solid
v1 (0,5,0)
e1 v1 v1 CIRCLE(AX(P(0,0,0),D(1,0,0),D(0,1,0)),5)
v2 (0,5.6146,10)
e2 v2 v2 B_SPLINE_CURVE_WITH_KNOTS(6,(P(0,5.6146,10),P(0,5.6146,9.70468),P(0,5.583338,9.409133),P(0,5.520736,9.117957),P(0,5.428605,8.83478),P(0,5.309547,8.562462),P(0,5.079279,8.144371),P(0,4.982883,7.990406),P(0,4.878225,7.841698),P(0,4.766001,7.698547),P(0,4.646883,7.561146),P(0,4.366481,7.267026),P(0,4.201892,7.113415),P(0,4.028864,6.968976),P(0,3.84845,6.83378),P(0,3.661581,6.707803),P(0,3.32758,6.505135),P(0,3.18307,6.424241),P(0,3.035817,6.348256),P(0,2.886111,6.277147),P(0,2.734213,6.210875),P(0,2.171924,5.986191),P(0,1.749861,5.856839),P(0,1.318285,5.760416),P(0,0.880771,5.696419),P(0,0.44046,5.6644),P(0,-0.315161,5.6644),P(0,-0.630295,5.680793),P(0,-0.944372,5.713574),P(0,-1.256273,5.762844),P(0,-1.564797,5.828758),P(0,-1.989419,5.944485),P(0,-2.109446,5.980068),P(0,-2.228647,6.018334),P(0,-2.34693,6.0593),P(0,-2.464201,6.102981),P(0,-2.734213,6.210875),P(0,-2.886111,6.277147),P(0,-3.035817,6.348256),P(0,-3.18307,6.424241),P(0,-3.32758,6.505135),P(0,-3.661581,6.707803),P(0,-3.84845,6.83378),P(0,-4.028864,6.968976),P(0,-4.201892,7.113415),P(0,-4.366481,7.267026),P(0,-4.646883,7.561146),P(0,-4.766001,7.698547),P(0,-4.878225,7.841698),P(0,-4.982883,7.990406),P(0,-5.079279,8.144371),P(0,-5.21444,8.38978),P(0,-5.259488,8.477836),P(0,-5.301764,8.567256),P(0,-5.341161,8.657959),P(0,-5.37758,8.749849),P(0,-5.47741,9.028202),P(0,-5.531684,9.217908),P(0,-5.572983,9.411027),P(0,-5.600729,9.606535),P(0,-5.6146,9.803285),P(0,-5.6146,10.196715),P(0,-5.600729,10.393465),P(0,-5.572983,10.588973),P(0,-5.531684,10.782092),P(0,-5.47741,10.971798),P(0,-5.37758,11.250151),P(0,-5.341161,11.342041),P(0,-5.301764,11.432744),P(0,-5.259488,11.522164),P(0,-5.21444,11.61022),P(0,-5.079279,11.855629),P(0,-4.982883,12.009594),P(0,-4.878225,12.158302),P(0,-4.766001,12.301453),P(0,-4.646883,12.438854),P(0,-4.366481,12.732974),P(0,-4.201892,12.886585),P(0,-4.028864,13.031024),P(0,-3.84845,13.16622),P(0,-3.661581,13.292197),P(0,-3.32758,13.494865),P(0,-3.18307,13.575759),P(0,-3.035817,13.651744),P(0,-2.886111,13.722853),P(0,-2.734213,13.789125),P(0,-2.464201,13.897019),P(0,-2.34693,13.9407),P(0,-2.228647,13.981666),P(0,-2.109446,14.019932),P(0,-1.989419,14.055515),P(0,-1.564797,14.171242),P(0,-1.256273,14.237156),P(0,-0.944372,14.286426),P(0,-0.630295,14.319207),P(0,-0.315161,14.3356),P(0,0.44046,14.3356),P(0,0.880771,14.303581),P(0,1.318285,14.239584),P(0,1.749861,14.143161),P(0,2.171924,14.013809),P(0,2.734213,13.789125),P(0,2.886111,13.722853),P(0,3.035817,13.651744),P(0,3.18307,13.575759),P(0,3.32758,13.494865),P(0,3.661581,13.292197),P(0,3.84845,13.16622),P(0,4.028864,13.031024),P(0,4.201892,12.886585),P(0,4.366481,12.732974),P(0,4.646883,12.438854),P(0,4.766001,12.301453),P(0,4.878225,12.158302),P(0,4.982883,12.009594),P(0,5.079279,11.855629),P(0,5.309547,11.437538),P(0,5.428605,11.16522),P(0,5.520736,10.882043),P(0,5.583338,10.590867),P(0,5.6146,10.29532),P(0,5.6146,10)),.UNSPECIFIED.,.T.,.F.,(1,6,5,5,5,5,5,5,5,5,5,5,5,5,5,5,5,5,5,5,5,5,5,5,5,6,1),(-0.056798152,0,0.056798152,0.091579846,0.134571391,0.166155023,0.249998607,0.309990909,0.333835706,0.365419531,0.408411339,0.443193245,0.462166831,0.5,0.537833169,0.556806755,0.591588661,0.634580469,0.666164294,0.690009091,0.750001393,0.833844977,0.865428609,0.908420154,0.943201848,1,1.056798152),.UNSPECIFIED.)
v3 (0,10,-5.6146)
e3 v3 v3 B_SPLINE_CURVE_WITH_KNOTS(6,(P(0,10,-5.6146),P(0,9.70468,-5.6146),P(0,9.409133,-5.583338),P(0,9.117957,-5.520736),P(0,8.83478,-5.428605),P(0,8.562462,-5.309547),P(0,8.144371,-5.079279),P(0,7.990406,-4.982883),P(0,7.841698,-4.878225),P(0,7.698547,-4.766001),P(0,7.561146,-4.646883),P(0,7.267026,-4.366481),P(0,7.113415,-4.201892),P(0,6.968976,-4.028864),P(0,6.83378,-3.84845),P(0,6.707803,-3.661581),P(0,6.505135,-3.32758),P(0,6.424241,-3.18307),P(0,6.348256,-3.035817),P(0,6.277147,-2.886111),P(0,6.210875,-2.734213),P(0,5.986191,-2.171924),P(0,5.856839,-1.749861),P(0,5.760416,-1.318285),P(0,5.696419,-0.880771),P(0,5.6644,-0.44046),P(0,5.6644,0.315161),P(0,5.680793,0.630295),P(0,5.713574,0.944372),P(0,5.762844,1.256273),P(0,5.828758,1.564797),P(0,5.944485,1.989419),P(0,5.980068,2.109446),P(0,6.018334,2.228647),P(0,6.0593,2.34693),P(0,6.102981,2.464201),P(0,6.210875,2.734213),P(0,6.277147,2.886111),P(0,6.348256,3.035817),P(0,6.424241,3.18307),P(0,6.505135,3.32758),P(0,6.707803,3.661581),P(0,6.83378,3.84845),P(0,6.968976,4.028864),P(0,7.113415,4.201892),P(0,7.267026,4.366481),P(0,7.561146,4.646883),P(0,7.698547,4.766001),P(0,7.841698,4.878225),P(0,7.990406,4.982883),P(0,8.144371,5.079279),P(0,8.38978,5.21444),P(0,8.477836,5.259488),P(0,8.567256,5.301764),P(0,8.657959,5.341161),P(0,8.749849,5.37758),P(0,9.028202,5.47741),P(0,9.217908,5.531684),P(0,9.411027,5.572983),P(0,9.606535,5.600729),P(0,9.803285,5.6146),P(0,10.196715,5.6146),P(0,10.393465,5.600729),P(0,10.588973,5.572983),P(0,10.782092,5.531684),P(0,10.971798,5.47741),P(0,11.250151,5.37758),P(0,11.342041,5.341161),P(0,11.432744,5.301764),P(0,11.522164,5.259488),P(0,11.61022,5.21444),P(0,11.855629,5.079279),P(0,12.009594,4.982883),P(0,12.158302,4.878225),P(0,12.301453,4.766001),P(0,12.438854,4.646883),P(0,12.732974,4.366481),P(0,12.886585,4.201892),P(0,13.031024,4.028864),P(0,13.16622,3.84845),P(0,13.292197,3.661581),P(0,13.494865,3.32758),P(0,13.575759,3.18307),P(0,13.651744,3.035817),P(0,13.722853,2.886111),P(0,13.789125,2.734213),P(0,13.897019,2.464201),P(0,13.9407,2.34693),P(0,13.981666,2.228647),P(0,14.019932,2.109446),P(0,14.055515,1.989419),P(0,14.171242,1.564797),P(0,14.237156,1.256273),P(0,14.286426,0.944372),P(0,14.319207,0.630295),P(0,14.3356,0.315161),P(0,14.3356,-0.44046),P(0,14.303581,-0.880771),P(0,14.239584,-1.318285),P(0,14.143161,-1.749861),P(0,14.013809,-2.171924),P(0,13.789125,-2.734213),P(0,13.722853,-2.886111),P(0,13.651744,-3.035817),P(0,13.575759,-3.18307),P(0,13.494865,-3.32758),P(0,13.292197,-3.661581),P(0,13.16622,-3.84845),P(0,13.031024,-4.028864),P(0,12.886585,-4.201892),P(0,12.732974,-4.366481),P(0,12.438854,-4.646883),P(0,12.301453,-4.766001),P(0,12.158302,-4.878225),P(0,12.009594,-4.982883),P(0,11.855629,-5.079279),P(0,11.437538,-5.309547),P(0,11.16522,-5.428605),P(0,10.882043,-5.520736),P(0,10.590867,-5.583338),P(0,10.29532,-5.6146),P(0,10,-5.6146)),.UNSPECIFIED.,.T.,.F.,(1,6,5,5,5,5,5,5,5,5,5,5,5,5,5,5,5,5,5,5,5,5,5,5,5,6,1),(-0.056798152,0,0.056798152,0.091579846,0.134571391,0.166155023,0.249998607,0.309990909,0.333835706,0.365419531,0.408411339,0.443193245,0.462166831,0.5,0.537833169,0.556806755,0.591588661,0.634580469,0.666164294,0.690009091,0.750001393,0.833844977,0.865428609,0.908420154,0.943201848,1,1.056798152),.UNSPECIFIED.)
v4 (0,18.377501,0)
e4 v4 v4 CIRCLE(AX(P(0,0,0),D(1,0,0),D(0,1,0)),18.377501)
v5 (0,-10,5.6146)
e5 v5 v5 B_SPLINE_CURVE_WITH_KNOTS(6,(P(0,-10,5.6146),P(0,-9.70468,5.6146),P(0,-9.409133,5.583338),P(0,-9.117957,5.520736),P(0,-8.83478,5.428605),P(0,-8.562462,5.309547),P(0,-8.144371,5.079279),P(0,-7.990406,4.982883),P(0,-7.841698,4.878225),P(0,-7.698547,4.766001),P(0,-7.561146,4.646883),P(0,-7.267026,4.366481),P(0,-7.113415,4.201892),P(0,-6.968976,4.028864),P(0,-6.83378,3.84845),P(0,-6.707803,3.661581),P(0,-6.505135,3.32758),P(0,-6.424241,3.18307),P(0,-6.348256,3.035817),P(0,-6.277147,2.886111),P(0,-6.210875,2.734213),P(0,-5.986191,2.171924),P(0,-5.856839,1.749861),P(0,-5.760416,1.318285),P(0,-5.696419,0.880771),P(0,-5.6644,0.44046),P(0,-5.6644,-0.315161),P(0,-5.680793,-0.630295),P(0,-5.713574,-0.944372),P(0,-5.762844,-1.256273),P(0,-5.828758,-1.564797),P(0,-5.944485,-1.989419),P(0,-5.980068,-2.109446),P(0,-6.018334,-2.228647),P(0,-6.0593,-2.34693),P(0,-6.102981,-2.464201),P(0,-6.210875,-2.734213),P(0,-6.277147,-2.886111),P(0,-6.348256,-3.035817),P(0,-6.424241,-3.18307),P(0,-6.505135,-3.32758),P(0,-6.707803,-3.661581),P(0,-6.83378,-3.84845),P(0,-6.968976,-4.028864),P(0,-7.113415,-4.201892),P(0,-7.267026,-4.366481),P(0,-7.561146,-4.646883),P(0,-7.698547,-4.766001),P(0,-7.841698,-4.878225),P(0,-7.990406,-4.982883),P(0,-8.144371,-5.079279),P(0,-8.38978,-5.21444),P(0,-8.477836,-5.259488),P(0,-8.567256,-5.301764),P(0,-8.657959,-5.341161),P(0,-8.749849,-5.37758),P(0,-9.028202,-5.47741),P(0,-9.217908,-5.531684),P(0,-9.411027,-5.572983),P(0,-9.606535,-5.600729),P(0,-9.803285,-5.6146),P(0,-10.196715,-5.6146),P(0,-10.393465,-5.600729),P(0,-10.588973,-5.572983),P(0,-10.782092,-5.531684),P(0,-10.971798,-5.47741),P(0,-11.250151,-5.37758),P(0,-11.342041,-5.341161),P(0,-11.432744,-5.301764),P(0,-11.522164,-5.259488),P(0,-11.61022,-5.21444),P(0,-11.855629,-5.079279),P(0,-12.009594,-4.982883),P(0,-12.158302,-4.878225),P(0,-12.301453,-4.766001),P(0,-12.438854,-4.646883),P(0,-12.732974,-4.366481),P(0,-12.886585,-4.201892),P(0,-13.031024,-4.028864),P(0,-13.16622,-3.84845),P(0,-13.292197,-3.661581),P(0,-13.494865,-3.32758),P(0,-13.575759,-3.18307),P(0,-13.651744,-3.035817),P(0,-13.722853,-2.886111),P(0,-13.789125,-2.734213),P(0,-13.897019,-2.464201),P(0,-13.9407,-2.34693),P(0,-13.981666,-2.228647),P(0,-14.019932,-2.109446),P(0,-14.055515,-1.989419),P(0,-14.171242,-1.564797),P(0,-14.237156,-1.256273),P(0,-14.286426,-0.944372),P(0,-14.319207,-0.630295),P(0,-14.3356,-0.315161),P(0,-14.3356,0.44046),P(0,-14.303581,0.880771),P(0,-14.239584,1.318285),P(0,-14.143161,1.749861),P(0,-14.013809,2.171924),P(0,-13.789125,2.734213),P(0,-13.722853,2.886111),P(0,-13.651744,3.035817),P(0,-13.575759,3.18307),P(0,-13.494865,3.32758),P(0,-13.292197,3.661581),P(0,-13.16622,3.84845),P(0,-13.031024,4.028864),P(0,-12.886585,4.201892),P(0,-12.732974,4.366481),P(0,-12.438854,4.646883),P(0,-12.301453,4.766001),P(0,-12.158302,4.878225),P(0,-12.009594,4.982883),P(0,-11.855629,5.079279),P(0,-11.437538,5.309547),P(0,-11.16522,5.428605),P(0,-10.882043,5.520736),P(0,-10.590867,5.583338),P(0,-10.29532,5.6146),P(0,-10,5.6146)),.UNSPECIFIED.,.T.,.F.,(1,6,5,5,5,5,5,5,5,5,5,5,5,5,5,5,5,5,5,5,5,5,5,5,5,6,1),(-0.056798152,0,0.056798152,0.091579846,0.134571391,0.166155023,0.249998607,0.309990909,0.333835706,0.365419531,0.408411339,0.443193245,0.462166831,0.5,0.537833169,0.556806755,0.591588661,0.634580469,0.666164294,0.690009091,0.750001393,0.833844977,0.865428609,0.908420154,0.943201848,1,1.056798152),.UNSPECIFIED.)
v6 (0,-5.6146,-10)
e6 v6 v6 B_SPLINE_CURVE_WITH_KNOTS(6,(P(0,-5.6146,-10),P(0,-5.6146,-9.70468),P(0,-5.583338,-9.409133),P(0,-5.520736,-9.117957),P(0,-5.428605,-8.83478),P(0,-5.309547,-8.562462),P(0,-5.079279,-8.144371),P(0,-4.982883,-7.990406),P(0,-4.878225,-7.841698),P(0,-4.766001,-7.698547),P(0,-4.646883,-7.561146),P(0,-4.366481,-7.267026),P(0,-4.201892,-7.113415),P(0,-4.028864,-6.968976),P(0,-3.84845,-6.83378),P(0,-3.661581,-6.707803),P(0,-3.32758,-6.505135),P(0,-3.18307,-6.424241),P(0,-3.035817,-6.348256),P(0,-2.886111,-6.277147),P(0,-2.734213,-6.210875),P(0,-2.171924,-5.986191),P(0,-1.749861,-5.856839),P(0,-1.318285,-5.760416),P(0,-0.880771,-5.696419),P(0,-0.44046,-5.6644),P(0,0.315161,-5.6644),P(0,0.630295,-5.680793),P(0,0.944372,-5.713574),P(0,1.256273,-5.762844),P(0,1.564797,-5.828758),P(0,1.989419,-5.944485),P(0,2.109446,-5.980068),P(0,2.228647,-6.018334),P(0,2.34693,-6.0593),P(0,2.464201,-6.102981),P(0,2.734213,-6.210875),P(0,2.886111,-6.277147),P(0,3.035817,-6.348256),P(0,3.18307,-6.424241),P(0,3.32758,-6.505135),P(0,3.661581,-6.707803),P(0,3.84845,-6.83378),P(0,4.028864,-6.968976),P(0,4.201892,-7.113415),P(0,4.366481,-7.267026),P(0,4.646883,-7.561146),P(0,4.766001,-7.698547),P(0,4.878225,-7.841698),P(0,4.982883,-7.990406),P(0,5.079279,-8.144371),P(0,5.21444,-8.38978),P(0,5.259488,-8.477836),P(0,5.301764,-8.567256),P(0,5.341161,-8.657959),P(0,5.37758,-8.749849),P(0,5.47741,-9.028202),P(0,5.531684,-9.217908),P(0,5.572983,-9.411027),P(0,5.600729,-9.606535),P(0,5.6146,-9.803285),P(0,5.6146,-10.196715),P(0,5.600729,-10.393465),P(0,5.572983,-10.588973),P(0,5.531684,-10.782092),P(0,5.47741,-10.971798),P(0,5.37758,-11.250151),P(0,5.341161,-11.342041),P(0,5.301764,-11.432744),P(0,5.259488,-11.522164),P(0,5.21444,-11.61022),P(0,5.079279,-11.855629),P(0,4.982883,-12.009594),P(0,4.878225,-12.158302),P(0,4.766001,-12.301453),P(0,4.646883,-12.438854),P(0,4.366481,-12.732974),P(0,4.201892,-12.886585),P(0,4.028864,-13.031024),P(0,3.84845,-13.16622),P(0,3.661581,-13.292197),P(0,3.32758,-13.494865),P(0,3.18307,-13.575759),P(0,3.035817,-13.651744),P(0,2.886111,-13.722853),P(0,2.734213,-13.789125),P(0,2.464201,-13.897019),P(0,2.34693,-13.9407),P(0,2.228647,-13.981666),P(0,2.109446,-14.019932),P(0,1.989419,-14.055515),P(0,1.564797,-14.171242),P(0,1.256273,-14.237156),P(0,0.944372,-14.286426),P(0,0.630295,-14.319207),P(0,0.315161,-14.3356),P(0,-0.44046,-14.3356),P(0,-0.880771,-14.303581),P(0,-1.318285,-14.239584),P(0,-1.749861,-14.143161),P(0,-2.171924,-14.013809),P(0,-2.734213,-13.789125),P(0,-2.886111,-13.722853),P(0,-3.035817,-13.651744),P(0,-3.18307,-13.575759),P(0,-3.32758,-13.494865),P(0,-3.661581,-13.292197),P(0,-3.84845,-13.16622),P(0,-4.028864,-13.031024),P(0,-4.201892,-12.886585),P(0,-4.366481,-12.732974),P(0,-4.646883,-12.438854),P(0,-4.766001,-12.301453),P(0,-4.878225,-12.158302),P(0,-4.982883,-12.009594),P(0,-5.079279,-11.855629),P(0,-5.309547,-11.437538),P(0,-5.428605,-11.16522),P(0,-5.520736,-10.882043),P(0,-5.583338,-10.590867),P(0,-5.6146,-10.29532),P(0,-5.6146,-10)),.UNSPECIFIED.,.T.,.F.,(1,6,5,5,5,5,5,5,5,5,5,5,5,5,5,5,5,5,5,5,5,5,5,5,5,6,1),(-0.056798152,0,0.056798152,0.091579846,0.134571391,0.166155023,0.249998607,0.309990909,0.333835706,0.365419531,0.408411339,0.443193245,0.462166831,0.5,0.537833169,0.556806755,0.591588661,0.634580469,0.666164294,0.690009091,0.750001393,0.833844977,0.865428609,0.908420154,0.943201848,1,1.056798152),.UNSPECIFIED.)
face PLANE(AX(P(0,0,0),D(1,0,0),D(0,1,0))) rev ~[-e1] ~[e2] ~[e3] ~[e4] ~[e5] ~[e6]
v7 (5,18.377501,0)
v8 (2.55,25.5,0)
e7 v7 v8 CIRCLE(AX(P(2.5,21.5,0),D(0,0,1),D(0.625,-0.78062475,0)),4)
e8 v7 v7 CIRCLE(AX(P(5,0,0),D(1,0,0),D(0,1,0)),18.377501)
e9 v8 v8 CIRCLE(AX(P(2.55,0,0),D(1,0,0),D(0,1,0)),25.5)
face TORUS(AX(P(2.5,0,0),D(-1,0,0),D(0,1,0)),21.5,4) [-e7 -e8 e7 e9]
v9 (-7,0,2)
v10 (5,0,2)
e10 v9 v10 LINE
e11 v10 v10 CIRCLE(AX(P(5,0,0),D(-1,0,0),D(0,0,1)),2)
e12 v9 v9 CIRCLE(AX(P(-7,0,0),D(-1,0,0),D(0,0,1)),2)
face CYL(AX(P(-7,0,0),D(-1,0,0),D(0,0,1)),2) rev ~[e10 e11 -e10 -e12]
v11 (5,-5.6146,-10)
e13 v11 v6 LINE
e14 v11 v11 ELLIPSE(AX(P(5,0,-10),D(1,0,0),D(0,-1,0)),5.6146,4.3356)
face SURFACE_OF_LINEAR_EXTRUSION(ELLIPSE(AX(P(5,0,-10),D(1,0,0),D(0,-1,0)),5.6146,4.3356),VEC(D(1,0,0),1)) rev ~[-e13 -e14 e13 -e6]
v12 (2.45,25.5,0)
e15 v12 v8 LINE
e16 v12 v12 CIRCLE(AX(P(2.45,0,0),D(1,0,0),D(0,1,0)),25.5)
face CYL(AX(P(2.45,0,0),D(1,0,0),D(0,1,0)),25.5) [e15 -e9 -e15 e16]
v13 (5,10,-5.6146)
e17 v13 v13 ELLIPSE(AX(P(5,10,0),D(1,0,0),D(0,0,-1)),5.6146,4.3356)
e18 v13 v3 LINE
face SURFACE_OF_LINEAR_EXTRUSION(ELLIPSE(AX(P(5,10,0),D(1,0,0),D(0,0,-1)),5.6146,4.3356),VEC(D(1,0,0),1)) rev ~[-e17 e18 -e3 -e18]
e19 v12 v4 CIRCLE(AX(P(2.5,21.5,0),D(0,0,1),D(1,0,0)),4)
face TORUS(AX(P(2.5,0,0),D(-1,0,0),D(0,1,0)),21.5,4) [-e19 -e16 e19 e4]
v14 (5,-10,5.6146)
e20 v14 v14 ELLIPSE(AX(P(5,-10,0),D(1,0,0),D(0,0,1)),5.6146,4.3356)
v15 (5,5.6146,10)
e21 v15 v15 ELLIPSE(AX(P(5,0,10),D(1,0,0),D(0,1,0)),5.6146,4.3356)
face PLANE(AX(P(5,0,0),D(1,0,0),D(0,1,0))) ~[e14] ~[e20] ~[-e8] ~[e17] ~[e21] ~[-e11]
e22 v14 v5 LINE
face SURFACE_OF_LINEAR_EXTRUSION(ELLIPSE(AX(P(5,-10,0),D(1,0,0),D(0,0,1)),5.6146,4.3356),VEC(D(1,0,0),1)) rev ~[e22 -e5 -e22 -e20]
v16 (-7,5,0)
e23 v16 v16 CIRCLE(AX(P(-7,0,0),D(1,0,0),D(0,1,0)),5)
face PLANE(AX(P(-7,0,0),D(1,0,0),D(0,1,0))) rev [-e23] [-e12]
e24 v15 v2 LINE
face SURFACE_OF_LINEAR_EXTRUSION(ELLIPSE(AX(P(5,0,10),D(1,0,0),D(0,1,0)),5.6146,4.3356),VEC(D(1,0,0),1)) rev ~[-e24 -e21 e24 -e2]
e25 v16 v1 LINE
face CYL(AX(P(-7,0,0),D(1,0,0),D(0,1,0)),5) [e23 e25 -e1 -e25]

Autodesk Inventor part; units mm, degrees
ref_plane "YZ Plane" through (0, 0, 0) normal (1, 0, 0) x (0, 1, 0)
ref_plane "XZ Plane" through (0, 0, 0) normal (0, 1, 0) x (-1, 0, 0)
ref_plane "XY Plane" through (0, 0, 0) normal (0, 0, 1) x (1, 0, 0)
sketch "Skizze1" plane through (0, 0, 0) normal (0, 0, 1) x (1, 0, 0)
  line L0 (0, 0) -> (5, 0)
  line L1 (5, 0) -> (5, 21.5)
  line L2 (5, 21.5) -> (0, 21.5)
  line L3 (0, 21.5) -> (0, 0)
  circle A0 centre (2.5, 21.5) radius 4
  line L4 (0, 0) -> (-7, 0)
  line L5 (-7, 0) -> (-7, 5)
  line L6 (-7, 5) -> (0, 5)
  line L7 (0, 5) -> (0, 0)
  line L8 (2.45, 25.5) -> (2.55, 25.5)
  line L9 (2.5, 21.5) -> (2.5, 25.5) construction
  line L10 (2.45, 25.5) -> (2.45, 25.4997)
  line L11 (2.55, 25.5) -> (2.55, 25.4997)
  dimension "d0" = 8
  dimension "d1" = 21.5
  dimension "d2" = 5
  dimension "d3" = 7
  dimension "d4" = 5
  dimension "d9" = 0.1
revolve "Umdrehung1" add sketch "Skizze1" angle 360 about axis through (0, 0, 0) along (1, 0, 0)
sketch "Skizze2" plane through (-7, 0, 0) normal (-1, 0, 0) x (0, 0, 1)
  circle A0 centre (0, 0) radius 2
  dimension "d6" = 4
extrude "Extrusion1" cut sketch "Skizze2" against normal up to next
sketch "Skizze3" plane through (5, 0, 0) normal (1, 0, 0) x (0, 0, -1)
  line L0 (0, 0) -> (-10, 0) construction
  ellipse E0 centre (-10, 0) end of major axis (-10, 5.6146) minor radius 4.3356
  ellipse E1 centre (0, -10) end of major axis (-5.6146, -10) minor radius 4.3356
  ellipse E2 centre (10, 0) end of major axis (10, -5.6146) minor radius 4.3356
  ellipse E3 centre (0, 10) end of major axis (5.6146, 10) minor radius 4.3356
  dimension "d10" = 10
  dimension "d13" = 360
extrude "Extrusion2" cut sketch "Skizze3" against normal up to next
properties part number "Fake Rad" material "Aluminium 6061"
